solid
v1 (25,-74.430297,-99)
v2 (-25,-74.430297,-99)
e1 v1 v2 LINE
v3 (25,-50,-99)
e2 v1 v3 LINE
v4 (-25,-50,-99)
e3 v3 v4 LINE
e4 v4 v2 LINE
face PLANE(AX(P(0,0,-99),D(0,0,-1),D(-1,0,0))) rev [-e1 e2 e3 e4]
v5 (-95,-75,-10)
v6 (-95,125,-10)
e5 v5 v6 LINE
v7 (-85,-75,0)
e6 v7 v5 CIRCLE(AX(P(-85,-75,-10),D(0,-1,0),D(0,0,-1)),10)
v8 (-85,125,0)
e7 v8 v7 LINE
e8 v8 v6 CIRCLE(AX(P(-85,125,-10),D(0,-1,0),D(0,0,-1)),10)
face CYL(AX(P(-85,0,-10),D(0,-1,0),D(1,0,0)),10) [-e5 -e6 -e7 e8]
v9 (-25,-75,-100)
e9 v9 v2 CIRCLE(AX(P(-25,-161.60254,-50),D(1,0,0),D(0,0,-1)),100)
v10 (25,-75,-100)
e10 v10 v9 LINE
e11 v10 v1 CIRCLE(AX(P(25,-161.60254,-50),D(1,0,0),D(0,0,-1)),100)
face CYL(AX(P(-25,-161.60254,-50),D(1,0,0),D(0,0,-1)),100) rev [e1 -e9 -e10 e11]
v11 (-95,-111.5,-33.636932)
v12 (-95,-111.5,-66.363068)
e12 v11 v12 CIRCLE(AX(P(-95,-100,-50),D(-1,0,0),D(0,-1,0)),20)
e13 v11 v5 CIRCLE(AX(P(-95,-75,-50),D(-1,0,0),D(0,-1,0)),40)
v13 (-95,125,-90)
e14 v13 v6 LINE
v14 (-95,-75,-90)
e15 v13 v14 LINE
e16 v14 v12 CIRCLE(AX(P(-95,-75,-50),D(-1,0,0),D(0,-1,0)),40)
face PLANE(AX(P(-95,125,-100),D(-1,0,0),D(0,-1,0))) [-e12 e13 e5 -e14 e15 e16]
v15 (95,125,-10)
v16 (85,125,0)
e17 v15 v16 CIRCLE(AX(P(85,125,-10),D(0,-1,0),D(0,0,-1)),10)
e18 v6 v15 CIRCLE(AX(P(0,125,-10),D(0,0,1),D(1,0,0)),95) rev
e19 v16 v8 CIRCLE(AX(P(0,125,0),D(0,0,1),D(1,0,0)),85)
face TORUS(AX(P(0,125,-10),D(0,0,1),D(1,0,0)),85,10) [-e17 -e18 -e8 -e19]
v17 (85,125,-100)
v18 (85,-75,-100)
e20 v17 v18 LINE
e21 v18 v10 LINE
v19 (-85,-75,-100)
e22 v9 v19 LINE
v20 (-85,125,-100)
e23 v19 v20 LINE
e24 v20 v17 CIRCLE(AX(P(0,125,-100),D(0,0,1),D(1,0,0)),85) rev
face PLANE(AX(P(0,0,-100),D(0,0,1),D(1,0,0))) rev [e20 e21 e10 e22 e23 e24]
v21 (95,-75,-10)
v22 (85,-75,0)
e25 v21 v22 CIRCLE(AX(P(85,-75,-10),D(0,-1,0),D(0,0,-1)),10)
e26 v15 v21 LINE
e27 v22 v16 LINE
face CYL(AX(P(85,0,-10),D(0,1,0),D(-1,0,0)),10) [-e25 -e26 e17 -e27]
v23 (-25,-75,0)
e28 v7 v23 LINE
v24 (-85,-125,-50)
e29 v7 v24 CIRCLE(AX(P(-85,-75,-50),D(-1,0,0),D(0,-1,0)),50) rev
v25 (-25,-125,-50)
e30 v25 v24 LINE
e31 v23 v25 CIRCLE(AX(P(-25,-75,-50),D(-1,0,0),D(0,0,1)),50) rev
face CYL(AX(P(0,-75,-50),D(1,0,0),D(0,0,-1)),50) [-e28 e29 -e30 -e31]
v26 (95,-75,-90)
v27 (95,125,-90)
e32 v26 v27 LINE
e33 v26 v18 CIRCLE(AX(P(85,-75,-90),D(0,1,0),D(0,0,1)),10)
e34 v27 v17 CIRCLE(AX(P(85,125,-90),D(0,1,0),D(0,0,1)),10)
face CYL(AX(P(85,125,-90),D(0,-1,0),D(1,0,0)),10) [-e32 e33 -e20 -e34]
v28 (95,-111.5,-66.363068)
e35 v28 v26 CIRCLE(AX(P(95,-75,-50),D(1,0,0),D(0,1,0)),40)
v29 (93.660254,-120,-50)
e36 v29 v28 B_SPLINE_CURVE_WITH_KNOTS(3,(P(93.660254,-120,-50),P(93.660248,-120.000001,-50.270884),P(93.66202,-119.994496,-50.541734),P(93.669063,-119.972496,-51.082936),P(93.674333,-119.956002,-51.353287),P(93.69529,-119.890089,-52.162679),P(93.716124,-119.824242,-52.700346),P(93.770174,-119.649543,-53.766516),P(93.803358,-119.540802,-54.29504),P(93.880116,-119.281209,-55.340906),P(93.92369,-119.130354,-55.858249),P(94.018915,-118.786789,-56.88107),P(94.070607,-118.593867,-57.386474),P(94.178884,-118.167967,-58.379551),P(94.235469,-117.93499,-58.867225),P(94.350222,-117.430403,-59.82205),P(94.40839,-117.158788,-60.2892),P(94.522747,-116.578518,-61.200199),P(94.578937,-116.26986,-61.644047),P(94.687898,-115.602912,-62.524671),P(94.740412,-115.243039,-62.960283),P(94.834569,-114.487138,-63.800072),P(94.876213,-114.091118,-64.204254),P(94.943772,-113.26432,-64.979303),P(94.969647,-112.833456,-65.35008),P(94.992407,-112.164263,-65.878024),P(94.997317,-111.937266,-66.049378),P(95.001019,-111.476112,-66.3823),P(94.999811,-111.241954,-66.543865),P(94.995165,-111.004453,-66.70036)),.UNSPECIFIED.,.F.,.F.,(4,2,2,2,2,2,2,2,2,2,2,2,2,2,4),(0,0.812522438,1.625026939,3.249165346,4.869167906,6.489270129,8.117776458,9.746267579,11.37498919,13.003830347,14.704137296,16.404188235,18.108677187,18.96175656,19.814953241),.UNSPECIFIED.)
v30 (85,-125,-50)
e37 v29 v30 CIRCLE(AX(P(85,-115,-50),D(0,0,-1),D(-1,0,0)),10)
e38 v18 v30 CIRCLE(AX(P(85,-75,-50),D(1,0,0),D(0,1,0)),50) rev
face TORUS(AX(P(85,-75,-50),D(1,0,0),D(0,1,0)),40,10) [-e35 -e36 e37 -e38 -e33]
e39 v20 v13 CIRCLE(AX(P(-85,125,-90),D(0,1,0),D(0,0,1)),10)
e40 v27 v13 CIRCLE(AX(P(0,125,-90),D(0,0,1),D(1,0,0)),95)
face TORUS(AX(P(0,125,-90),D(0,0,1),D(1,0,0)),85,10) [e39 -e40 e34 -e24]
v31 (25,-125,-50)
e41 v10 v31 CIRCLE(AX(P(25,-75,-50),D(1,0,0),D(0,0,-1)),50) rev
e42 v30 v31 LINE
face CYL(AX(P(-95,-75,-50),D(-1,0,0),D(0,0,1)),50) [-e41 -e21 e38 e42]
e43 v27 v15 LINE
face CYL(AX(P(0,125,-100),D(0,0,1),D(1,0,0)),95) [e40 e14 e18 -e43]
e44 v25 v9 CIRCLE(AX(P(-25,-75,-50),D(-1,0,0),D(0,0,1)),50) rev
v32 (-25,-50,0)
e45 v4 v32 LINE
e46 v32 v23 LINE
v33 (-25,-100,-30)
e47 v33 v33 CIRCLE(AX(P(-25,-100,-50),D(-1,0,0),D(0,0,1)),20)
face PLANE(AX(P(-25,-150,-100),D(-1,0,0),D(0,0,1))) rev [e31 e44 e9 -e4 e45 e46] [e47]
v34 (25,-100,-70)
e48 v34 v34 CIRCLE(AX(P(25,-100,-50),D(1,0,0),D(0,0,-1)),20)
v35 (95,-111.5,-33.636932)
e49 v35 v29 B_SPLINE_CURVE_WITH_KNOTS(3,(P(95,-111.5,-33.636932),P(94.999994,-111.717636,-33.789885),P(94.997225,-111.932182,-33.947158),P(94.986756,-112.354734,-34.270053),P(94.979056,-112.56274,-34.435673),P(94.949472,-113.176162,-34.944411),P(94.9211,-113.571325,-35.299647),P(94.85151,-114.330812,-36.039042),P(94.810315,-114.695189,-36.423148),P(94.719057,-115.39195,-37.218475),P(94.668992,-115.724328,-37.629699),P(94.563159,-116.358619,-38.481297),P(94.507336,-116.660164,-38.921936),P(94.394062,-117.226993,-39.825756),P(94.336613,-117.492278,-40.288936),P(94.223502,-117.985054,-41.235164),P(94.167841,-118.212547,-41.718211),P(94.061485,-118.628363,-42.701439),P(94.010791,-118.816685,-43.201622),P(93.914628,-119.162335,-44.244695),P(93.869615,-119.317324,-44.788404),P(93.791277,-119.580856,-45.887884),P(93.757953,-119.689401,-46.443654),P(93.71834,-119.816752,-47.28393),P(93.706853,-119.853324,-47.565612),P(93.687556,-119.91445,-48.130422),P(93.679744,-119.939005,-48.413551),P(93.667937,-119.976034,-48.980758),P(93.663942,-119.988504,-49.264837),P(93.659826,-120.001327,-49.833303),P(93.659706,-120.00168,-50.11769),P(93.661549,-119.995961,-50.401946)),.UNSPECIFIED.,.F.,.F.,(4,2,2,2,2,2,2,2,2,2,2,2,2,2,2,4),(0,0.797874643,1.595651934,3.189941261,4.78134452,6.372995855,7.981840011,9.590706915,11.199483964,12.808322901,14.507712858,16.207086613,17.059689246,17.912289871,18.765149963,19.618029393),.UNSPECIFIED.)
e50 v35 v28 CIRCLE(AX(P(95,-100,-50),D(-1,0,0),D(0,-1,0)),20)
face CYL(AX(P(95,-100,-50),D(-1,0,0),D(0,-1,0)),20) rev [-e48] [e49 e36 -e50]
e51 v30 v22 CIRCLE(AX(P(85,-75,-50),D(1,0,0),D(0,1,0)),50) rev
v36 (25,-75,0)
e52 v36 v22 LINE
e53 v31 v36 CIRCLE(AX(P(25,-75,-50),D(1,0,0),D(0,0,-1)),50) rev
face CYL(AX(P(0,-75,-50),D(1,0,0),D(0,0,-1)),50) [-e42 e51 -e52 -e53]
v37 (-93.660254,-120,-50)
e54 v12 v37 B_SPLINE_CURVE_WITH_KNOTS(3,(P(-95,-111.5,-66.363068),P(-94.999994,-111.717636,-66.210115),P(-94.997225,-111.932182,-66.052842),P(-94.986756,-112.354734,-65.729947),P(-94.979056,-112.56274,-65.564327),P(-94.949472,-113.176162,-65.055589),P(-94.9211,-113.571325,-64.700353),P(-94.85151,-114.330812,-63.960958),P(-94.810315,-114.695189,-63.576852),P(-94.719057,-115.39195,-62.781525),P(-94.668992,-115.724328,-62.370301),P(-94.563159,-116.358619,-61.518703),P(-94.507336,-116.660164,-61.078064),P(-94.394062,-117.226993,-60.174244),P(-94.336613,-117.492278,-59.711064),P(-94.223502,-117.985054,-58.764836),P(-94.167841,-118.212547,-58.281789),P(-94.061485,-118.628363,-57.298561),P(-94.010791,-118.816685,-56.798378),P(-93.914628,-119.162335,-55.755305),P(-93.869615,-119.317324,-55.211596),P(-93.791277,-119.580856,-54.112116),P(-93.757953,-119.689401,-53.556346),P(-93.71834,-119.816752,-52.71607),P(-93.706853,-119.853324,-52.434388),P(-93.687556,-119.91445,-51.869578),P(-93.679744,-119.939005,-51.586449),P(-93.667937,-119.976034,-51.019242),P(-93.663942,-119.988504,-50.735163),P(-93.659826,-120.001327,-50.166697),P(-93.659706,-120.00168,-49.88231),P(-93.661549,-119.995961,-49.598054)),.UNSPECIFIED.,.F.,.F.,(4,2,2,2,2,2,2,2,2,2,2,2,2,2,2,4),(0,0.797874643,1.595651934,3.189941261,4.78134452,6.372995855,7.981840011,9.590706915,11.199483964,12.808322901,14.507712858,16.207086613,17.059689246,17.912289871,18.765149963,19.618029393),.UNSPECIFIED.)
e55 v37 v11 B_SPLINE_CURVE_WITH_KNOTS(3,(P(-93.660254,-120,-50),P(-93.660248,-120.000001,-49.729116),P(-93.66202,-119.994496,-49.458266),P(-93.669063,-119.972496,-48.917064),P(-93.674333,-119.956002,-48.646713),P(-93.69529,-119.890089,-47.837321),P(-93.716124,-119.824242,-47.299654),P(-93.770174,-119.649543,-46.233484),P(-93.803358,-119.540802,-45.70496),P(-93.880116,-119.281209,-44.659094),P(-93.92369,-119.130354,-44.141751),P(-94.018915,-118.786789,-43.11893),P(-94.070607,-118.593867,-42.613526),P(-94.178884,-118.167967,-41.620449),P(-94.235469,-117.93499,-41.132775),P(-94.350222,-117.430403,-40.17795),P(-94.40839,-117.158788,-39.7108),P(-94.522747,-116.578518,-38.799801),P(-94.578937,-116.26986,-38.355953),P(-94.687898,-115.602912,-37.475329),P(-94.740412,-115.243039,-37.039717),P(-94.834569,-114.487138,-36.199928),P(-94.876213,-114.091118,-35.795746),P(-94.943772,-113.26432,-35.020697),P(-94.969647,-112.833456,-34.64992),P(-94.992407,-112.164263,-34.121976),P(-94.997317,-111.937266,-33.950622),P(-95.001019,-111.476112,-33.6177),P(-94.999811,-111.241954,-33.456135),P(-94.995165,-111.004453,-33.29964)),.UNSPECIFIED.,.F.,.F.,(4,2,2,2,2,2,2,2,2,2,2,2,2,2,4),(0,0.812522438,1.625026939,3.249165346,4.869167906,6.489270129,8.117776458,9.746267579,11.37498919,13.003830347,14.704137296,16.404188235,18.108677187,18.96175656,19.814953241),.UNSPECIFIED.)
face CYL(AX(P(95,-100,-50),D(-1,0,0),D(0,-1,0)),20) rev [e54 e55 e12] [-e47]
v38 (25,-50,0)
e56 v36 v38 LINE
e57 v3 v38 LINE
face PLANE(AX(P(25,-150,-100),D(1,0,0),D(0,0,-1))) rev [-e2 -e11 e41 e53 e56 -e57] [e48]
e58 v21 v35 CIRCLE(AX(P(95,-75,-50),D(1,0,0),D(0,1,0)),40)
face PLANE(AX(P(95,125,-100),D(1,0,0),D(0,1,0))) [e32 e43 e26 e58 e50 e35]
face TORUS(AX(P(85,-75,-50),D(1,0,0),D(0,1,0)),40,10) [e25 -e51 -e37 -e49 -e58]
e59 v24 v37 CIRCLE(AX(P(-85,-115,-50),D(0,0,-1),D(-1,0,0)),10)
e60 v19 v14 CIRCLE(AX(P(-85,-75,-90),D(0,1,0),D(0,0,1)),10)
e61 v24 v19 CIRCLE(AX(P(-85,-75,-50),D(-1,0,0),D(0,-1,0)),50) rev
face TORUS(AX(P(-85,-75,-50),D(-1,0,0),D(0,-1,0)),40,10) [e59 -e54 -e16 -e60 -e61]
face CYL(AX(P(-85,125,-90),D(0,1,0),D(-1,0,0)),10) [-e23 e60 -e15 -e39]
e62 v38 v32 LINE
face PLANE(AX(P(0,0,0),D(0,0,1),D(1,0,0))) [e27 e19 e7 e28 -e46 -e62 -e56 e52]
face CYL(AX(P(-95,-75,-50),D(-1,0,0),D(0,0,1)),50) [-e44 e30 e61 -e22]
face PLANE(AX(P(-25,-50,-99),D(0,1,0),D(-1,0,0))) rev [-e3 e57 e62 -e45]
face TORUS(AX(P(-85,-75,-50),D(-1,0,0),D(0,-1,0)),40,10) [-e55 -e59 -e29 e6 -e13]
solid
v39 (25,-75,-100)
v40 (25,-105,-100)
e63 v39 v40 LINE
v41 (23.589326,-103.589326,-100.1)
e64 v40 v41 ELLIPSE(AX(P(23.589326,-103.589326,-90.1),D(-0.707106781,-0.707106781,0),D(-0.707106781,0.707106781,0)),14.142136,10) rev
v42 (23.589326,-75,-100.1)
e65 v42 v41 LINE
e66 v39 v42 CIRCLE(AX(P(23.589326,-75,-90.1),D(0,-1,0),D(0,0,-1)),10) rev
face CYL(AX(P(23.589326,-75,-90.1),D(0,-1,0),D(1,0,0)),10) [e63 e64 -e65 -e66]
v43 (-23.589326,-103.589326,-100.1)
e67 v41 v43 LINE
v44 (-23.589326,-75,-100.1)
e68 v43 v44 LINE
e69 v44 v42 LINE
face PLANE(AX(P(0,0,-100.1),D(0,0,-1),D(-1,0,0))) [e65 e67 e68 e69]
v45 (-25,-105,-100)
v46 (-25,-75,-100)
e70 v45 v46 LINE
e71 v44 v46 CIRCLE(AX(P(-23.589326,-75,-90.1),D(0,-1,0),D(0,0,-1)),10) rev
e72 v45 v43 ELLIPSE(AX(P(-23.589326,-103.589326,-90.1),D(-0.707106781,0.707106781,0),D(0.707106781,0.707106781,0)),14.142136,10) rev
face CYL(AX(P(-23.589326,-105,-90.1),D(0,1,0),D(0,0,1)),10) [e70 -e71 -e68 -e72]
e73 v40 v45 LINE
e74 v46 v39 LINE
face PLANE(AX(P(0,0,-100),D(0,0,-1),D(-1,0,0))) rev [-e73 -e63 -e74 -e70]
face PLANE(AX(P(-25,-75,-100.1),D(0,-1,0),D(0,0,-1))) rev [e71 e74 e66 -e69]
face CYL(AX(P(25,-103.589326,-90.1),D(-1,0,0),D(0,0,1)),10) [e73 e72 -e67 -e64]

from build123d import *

# Parameters (mm, degrees)
BOSS_EXTRUDE1_DEPTH    = 100
SKETCH2_W              = 50
SKETCH2_H              = 50
CUT_EXTRUDE1_DEPTH     = 187.14510469
CUT_EXTRUDE2_DEPTH     = 25
SKETCH7_R              = 20
CUT_EXTRUDE3_DEPTH     = 249.445164976
FILLET2_R              = 50
CUT_EXTRUDE6_START     = -125
CUT_EXTRUDE6_OUTLINE_W = 50
CUT_EXTRUDE6_OUTLINE_H = 6.698729811
CUT_EXTRUDE6_DEPTH     = 50
CUT_EXTRUDE7_DEPTH     = 25
BOSS_EXTRUDE2_DEPTH    = 100
FILLET4_R              = 10
SKETCH11_W             = 50
SKETCH11_H             = 25
CUT_EXTRUDE11_DEPTH    = 99
SKETCH16_W             = 50
SKETCH16_H             = 30
BOSS_EXTRUDE3_DEPTH    = 0.1
FILLET5_R              = 10


with BuildPart() as part:
    # Sketch1 → Boss-Extrude1 (new body)
    with BuildSketch(Plane.XY):
        Polygon((-95, 125), (20.2, 125), (69.8, 125), (95, 125), (95, -125), (-95, -125), align=None)
    extrude(amount=-BOSS_EXTRUDE1_DEPTH)

    # Sketch2 → Cut-Extrude1 (cut, through all)
    with BuildSketch(Plane.XY):
        with Locations((0, -125)):
            Rectangle(SKETCH2_W, SKETCH2_H)
    extrude(amount=-CUT_EXTRUDE1_DEPTH, mode=Mode.SUBTRACT)

    # Sketch6 → Cut-Extrude2 (cut, symmetric)
    with BuildSketch(Plane(origin=(0, 0, 0), x_dir=(0, 0, -1), z_dir=(1, 0, 0))):
        with BuildLine():
            Line((100, -100), (0, -100))
            ThreePointArc((0, -100), (50, -50), (100, -100))
        make_face()
    extrude(amount=CUT_EXTRUDE2_DEPTH, both=True, mode=Mode.SUBTRACT)

    # Sketch7 → Cut-Extrude3 (cut, through all)
    with BuildSketch(Plane.ZY.offset(95)):
        with Locations(Location((-50, -100, 0), (0, 0, 270))):
            Circle(SKETCH7_R)
    extrude(amount=-CUT_EXTRUDE3_DEPTH, mode=Mode.SUBTRACT)

    # Fillet2
    fillet2_edges = [part.edges().sort_by_distance(p)[0] for p in [
        (-60, -125, -100),
        (-60, -125, 0),
    ]]
    fillet(fillet2_edges, radius=FILLET2_R - 0.0001)  # a hair under: the kernel refuses the full size

    # Cut-Extrude6: read off the stored shape, not the designer's step
    # Cut-Extrude6 outline → Cut-Extrude6 (cut)
    with BuildSketch(Plane(origin=(0, 0, 0), x_dir=(1, 0, 0), z_dir=(0, 1, 0)).offset(CUT_EXTRUDE6_START)):
        with Locations((0, 96.650635095)):
            Rectangle(CUT_EXTRUDE6_OUTLINE_W, CUT_EXTRUDE6_OUTLINE_H)
        with Locations((0, 3.349364906)):
            Rectangle(CUT_EXTRUDE6_OUTLINE_W, CUT_EXTRUDE6_OUTLINE_H)
    extrude(amount=CUT_EXTRUDE6_DEPTH, mode=Mode.SUBTRACT)

    # Sketch10 → Cut-Extrude7 (cut, symmetric)
    with BuildSketch(Plane(origin=(0, 0, 0), x_dir=(0, 0, -1), z_dir=(1, 0, 0))):
        with BuildLine():
            Line((0, -75), (100, -75))
            ThreePointArc((100, -75), (50, -61.602540378), (0, -75))
        make_face()
    extrude(amount=CUT_EXTRUDE7_DEPTH, both=True, mode=Mode.SUBTRACT)

    # Sketch15 → Boss-Extrude2 (add)
    with BuildSketch(Plane.XY):
        with BuildLine():
            Line((-95, 125), (95, 125))
            ThreePointArc((95, 125), (0, 220), (-95, 125))
        make_face()
    extrude(amount=-BOSS_EXTRUDE2_DEPTH)

    # Fillet4
    # the kernel refuses this fillet: 10 mm, written as the material it takes off along each edge
    with BuildSketch(Plane(origin=(0, 125, -100), x_dir=(1, 0, 0), z_dir=(0, -1, 0))) as fillet4_piece_1:
        with BuildLine():
            CenterArc((95 - FILLET4_R, FILLET4_R), FILLET4_R, 270, 90)
            Line((95, FILLET4_R), (95, 0))
            Line((95, 0), (95 - FILLET4_R, 0))
        make_face()
    revolve(axis=Axis((0, 125, -100), (0, 0, 1)), revolution_arc=180, mode=Mode.SUBTRACT)
    with BuildSketch(Plane(origin=(0, 125, 0), x_dir=(1, 0, 0), z_dir=(0, -1, 0))) as fillet4_piece_2:
        with BuildLine():
            CenterArc((95 - FILLET4_R, -FILLET4_R), FILLET4_R, 0, 90)
            Line((95, -FILLET4_R), (95, 0))
            Line((95, 0), (95 - FILLET4_R, 0))
        make_face()
    revolve(axis=Axis((0, 125, 0), (0, 0, 1)), revolution_arc=180, mode=Mode.SUBTRACT)
    with BuildSketch(Plane(origin=(-95, -75.0001, -100), x_dir=(0, 0, 1), z_dir=(0, 1, 0)), Plane(origin=(95, 125, 0), x_dir=(-1, 0, 0), z_dir=(0, -1, 0))) as fillet4_piece_3:
        with BuildLine():
            CenterArc((FILLET4_R, FILLET4_R), FILLET4_R, 180, 90)
            Line((0, FILLET4_R), (0, 0))
            Line((0, 0), (FILLET4_R, 0))
        make_face()
    extrude(amount=200.0001, mode=Mode.SUBTRACT)
    with BuildSketch(Plane(origin=(95, 125, -100), x_dir=(-1, 0, 0), z_dir=(0, -1, 0)), Plane(origin=(-95, -75.0001, 0), x_dir=(0, 0, -1), z_dir=(0, 1, 0))) as fillet4_piece_4:
        with BuildLine():
            CenterArc((FILLET4_R, -FILLET4_R), FILLET4_R, 90, 90)
            Line((0, -FILLET4_R), (0, 0))
            Line((0, 0), (FILLET4_R, 0))
        make_face()
    extrude(amount=200.0001, mode=Mode.SUBTRACT)
    with BuildSketch(Plane(origin=(95, -75.0001, -49.9999), x_dir=(0, 0, 1), z_dir=(0, 1, 0))) as fillet4_piece_5:
        with BuildLine():
            CenterArc((49.9999 - FILLET4_R, -FILLET4_R), FILLET4_R, 0, 90)
            Line((49.9999 - FILLET4_R, 0), (49.9999, 0))
            Line((49.9999, 0), (49.9999, -FILLET4_R))
        make_face()
    revolve(axis=Axis((95, -75.0001, -49.9999), (1, 0, 0)), revolution_arc=90, mode=Mode.SUBTRACT)
    with BuildSketch(Plane(origin=(95, -75.0001, -50.0001), x_dir=(0, 0, -1), z_dir=(0, 1, 0))) as fillet4_piece_6:
        with BuildLine():
            CenterArc((49.9999 - FILLET4_R, FILLET4_R), FILLET4_R, 270, 90)
            Line((49.9999, FILLET4_R), (49.9999, 0))
            Line((49.9999, 0), (49.9999 - FILLET4_R, 0))
        make_face()
    revolve(axis=Axis((95, -75.0001, -50.0001), (-1, 0, 0)), revolution_arc=90, mode=Mode.SUBTRACT)
    with BuildSketch(Plane(origin=(-95, -75.0001, -49.9999), x_dir=(0, 0, 1), z_dir=(0, 1, 0))) as fillet4_piece_7:
        with BuildLine():
            CenterArc((49.9999 - FILLET4_R, FILLET4_R), FILLET4_R, 270, 90)
            Line((49.9999, FILLET4_R), (49.9999, 0))
            Line((49.9999, 0), (49.9999 - FILLET4_R, 0))
        make_face()
    revolve(axis=Axis((-95, -75.0001, -49.9999), (1, 0, 0)), revolution_arc=90, mode=Mode.SUBTRACT)
    with BuildSketch(Plane(origin=(-95, -75.0001, -50.0001), x_dir=(0, 0, -1), z_dir=(0, 1, 0))) as fillet4_piece_8:
        with BuildLine():
            CenterArc((49.9999 - FILLET4_R, -FILLET4_R), FILLET4_R, 0, 90)
            Line((49.9999, -FILLET4_R), (49.9999, 0))
            Line((49.9999, 0), (49.9999 - FILLET4_R, 0))
        make_face()
    revolve(axis=Axis((-95, -75.0001, -50.0001), (-1, 0, 0)), revolution_arc=90, mode=Mode.SUBTRACT)
    with BuildSketch(Plane(origin=(-95, -125, -49.9999), x_dir=(0, 1, 0), z_dir=(0, 0, -1))) as fillet4_piece_9:
        with BuildLine():
            CenterArc((FILLET4_R, FILLET4_R), FILLET4_R, 180, 90)
            Line((0, FILLET4_R), (0, 0))
            Line((0, 0), (FILLET4_R, 0))
        make_face()
    extrude(amount=0.0002, mode=Mode.SUBTRACT)
    with BuildSketch(Plane(origin=(95, -125, -49.9999), x_dir=(0, 1, 0), z_dir=(0, 0, -1))) as fillet4_piece_10:
        with BuildLine():
            CenterArc((FILLET4_R, -FILLET4_R), FILLET4_R, 90, 90)
            Line((0, -FILLET4_R), (0, 0))
            Line((0, 0), (FILLET4_R, 0))
        make_face()
    extrude(amount=0.0002, mode=Mode.SUBTRACT)

    # Sketch11 → Cut-Extrude11 (cut)
    with BuildSketch(Plane.XY):
        with Locations((0, -62.5)):
            Rectangle(SKETCH11_W, SKETCH11_H)
    extrude(amount=-CUT_EXTRUDE11_DEPTH, mode=Mode.SUBTRACT)


with BuildPart() as body_2:
    # Sketch16 → Boss-Extrude3 (new body)
    with BuildSketch(Plane(origin=(0, 0, -100), x_dir=(-1, 0, 0), z_dir=(0, 0, -1))):
        with Locations((0, -90)):
            Rectangle(SKETCH16_W, SKETCH16_H)
    extrude(amount=BOSS_EXTRUDE3_DEPTH)

    # Fillet5
    # the kernel refuses this fillet: 10 mm, written as the material it takes off along each edge
    with BuildSketch(Plane(origin=(25, -71.473316005, -100.1), x_dir=(0, 0, 1), z_dir=(0, -1, 0)), Plane(origin=(-25, -108.526683995, -100.1), x_dir=(0, 0, 1), z_dir=(0, 1, 0))) as fillet5_piece_1:
        with BuildLine():
            CenterArc((10, 1.410673598), FILLET5_R, 180, 8.109614456)
            Line((0, 1.410673598), (0, 0))
            Line((0, 0), (0.1, 0))
        make_face()
    extrude(amount=37.05336799, mode=Mode.SUBTRACT)
    with BuildSketch(Plane(origin=(28.526683995, -105, -100.1), x_dir=(0, 0, 1), z_dir=(-1, 0, 0))) as fillet5_piece_2:
        with BuildLine():
            CenterArc((10, 1.410673598), FILLET5_R, 180, 8.109614456)
            Line((0, 1.410673598), (0, 0))
            Line((0, 0), (0.1, 0))
        make_face()
    extrude(amount=57.05336799, mode=Mode.SUBTRACT)


solid = Compound([part.part, body_2.part])
